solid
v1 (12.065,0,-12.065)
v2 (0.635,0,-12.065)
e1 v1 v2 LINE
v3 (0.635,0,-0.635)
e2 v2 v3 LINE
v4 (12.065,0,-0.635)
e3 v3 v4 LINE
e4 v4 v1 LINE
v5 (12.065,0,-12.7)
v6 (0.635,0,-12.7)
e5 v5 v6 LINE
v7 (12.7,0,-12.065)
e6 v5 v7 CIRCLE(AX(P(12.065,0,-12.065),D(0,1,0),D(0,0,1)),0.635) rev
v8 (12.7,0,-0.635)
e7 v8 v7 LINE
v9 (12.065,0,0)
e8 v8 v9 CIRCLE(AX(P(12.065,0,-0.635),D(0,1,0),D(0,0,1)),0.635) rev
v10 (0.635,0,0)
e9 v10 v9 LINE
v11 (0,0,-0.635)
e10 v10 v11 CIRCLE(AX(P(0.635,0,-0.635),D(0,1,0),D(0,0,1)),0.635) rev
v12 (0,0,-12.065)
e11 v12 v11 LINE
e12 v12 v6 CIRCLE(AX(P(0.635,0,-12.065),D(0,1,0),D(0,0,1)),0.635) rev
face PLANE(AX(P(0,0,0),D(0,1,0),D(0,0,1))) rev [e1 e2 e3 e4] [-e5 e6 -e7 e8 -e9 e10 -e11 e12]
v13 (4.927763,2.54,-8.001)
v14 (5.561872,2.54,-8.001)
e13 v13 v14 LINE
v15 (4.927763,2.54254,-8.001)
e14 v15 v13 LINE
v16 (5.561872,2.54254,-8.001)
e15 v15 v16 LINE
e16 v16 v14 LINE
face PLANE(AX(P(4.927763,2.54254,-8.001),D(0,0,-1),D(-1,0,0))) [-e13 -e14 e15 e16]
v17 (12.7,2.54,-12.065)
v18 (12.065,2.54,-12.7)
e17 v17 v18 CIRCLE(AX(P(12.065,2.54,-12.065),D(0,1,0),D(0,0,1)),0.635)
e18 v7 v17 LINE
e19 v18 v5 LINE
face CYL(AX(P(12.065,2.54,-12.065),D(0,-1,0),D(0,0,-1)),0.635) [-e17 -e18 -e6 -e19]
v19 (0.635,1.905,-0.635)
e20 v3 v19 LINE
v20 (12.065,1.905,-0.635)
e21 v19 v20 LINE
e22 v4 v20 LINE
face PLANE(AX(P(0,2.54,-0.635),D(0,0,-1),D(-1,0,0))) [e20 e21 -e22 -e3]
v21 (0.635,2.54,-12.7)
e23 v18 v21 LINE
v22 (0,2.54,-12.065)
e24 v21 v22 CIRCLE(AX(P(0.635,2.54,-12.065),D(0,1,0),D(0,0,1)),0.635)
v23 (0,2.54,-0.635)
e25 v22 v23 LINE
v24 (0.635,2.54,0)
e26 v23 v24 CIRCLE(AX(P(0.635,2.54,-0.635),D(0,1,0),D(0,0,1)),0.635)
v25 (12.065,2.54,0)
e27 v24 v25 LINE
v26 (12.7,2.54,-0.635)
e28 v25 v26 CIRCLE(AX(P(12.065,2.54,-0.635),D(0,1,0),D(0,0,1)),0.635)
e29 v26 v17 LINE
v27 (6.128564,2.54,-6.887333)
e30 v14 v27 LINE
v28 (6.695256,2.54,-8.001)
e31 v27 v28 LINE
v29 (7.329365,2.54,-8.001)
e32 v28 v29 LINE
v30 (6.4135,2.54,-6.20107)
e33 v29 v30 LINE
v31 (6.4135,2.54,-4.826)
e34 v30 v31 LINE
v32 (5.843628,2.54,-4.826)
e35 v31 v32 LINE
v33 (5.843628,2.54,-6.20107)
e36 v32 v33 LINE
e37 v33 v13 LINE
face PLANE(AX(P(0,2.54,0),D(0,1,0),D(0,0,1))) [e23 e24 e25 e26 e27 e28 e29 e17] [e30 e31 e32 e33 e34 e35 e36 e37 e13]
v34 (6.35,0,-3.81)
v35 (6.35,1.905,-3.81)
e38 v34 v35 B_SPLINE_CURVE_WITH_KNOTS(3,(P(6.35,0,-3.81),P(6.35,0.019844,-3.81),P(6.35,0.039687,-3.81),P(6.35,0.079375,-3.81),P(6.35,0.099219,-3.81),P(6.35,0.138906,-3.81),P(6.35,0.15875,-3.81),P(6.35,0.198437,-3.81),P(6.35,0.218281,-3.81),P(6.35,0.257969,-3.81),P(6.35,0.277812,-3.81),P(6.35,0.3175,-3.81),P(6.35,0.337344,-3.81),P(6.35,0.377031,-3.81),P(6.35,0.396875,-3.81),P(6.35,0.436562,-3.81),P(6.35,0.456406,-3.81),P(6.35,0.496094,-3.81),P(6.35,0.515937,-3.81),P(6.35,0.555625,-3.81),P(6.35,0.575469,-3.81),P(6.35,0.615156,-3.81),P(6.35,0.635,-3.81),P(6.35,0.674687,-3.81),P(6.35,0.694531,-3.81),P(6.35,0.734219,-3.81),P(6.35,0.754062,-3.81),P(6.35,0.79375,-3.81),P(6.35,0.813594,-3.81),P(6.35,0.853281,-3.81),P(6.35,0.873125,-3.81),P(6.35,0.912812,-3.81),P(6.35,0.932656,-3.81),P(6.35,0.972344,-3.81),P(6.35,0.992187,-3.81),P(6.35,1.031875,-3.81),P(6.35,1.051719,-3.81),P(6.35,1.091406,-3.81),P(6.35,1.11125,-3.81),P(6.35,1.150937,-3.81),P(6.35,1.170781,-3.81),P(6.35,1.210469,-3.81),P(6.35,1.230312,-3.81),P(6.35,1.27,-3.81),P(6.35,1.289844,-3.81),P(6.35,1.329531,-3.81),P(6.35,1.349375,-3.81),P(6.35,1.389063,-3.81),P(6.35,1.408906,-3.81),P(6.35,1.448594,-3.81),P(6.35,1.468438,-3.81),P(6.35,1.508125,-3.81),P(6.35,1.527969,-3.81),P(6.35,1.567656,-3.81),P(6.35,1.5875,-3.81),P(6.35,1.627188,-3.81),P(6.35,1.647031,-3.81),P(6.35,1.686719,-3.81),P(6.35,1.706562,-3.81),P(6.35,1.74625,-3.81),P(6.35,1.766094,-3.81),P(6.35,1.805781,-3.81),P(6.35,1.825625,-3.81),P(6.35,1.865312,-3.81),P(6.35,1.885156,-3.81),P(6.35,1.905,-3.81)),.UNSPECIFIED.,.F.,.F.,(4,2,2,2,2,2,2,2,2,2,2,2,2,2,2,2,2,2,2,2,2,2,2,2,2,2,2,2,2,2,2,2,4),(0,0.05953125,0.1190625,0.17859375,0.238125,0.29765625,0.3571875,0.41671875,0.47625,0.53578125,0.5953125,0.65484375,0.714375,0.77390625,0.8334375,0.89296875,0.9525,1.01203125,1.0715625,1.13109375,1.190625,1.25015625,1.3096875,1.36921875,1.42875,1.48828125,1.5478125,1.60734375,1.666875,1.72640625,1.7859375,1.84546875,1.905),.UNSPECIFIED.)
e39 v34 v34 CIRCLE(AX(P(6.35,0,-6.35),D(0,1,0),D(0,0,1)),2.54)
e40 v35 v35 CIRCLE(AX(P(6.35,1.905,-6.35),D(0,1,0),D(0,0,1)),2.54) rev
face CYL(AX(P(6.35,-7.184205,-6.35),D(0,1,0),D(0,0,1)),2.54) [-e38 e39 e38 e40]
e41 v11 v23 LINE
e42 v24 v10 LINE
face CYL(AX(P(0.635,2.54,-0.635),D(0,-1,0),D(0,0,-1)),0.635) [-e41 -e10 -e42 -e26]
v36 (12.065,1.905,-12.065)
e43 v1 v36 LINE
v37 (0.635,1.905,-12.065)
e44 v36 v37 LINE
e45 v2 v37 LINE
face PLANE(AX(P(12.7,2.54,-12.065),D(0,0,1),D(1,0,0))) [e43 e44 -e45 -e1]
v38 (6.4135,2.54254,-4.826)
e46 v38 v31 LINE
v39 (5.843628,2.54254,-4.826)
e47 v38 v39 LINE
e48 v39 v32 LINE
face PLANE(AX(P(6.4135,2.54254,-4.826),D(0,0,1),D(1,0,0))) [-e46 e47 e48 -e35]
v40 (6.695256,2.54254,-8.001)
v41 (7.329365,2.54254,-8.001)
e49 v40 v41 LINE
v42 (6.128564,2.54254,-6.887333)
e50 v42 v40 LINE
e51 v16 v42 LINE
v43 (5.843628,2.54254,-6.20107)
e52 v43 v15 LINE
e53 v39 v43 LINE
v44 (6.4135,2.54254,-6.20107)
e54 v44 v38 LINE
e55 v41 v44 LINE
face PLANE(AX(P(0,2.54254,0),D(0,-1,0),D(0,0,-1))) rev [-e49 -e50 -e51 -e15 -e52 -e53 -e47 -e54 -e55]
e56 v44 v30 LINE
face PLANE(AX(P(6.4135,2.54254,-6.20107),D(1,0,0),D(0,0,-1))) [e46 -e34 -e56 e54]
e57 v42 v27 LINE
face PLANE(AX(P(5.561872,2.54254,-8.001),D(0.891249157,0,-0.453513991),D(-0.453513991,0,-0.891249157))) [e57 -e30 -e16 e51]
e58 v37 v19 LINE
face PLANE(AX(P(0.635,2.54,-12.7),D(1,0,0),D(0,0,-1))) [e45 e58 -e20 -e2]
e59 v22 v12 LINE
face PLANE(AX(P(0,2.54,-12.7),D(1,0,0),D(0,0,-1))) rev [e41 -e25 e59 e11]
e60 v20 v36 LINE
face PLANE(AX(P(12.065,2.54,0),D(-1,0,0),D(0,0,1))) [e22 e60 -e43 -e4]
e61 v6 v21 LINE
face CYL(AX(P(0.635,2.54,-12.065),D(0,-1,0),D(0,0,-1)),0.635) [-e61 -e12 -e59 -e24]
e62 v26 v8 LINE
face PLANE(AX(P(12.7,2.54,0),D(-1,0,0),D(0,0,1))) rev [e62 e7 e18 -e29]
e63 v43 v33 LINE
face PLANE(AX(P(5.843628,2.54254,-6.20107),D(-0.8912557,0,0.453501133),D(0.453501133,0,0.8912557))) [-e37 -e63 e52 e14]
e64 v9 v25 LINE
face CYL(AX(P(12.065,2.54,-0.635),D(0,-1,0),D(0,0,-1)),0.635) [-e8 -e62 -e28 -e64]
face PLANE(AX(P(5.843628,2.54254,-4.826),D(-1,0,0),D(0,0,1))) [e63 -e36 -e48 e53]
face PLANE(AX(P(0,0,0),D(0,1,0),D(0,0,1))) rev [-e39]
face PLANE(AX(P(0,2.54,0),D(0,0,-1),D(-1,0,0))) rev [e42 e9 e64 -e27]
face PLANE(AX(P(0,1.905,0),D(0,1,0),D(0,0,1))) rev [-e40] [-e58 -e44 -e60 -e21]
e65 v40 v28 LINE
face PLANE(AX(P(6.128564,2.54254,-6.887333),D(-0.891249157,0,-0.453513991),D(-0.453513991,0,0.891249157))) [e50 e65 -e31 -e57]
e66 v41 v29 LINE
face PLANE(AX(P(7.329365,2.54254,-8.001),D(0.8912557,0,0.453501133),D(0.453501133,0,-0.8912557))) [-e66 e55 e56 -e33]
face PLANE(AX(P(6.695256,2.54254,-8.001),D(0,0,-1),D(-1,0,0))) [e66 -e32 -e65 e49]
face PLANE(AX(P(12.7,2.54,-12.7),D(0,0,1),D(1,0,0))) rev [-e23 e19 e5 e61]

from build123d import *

# Parameters (mm, degrees)
SKETCH1_W           = 12.7
SKETCH1_H           = 12.7
BOSS_EXTRUDE1_DEPTH = 2.54
FILLET1_R           = 0.635
SHELL1_START        = 0.635
SHELL1_OUTLINE_W    = 1.905
SHELL1_OUTLINE_H    = 11.43
SHELL1_DEPTH        = 11.43
SKETCH2_R           = 2.54
BOSS_EXTRUDE2_DEPTH = 1.905
BOSS_EXTRUDE3_DEPTH = 0.00254


# Read off the part's stored shape, not the designer's step: Shell1
with BuildPart() as part:
    # Sketch1 → Boss-Extrude1 (new body)
    with BuildSketch(Plane(origin=(0, 0, 0), x_dir=(1, 0, 0), z_dir=(0, 1, 0))):
        with Locations((6.35, 6.35)):
            Rectangle(SKETCH1_W, SKETCH1_H)
    extrude(amount=BOSS_EXTRUDE1_DEPTH)

    # Fillet1
    fillet1_edges = [part.edges().sort_by_distance(p)[0] for p in [
        (0, 1.27, -12.7),
        (12.7, 1.27, -12.7),
        (12.7, 1.27, 0),
        (0, 1.27, 0),
    ]]
    fillet(fillet1_edges, radius=FILLET1_R)

    # Shell1 outline → Shell1 (cut)
    with BuildSketch(Plane.YZ.offset(SHELL1_START)):
        with Locations((0.9525, -6.35)):
            Rectangle(SHELL1_OUTLINE_W, SHELL1_OUTLINE_H)
    extrude(amount=SHELL1_DEPTH, mode=Mode.SUBTRACT)

    # Sketch2 → Boss-Extrude2 (add)
    with BuildSketch(Plane(origin=(0, 1.905, 0), x_dir=(-1, 0, 0), z_dir=(0, -1, 0))):
        with Locations(Location((-6.35, 6.35, 0), (0, 0, 270))):
            Circle(SKETCH2_R)
    extrude(amount=BOSS_EXTRUDE2_DEPTH)

    # Sketch3 → Boss-Extrude3 (add)
    with BuildSketch(Plane(origin=(0, 2.54, 0), x_dir=(1, 0, 0), z_dir=(0, 1, 0))):
        Polygon((4.927762821, 8.001), (5.561872396, 8.001), (6.128564103, 6.887333133), (6.695255809, 8.001), (7.329365385, 8.001), (6.4135, 6.201070112), (6.4135, 4.826), (5.843628205, 4.826), (5.843628205, 6.201070112), align=None)
    extrude(amount=BOSS_EXTRUDE3_DEPTH)


solid = part.part
